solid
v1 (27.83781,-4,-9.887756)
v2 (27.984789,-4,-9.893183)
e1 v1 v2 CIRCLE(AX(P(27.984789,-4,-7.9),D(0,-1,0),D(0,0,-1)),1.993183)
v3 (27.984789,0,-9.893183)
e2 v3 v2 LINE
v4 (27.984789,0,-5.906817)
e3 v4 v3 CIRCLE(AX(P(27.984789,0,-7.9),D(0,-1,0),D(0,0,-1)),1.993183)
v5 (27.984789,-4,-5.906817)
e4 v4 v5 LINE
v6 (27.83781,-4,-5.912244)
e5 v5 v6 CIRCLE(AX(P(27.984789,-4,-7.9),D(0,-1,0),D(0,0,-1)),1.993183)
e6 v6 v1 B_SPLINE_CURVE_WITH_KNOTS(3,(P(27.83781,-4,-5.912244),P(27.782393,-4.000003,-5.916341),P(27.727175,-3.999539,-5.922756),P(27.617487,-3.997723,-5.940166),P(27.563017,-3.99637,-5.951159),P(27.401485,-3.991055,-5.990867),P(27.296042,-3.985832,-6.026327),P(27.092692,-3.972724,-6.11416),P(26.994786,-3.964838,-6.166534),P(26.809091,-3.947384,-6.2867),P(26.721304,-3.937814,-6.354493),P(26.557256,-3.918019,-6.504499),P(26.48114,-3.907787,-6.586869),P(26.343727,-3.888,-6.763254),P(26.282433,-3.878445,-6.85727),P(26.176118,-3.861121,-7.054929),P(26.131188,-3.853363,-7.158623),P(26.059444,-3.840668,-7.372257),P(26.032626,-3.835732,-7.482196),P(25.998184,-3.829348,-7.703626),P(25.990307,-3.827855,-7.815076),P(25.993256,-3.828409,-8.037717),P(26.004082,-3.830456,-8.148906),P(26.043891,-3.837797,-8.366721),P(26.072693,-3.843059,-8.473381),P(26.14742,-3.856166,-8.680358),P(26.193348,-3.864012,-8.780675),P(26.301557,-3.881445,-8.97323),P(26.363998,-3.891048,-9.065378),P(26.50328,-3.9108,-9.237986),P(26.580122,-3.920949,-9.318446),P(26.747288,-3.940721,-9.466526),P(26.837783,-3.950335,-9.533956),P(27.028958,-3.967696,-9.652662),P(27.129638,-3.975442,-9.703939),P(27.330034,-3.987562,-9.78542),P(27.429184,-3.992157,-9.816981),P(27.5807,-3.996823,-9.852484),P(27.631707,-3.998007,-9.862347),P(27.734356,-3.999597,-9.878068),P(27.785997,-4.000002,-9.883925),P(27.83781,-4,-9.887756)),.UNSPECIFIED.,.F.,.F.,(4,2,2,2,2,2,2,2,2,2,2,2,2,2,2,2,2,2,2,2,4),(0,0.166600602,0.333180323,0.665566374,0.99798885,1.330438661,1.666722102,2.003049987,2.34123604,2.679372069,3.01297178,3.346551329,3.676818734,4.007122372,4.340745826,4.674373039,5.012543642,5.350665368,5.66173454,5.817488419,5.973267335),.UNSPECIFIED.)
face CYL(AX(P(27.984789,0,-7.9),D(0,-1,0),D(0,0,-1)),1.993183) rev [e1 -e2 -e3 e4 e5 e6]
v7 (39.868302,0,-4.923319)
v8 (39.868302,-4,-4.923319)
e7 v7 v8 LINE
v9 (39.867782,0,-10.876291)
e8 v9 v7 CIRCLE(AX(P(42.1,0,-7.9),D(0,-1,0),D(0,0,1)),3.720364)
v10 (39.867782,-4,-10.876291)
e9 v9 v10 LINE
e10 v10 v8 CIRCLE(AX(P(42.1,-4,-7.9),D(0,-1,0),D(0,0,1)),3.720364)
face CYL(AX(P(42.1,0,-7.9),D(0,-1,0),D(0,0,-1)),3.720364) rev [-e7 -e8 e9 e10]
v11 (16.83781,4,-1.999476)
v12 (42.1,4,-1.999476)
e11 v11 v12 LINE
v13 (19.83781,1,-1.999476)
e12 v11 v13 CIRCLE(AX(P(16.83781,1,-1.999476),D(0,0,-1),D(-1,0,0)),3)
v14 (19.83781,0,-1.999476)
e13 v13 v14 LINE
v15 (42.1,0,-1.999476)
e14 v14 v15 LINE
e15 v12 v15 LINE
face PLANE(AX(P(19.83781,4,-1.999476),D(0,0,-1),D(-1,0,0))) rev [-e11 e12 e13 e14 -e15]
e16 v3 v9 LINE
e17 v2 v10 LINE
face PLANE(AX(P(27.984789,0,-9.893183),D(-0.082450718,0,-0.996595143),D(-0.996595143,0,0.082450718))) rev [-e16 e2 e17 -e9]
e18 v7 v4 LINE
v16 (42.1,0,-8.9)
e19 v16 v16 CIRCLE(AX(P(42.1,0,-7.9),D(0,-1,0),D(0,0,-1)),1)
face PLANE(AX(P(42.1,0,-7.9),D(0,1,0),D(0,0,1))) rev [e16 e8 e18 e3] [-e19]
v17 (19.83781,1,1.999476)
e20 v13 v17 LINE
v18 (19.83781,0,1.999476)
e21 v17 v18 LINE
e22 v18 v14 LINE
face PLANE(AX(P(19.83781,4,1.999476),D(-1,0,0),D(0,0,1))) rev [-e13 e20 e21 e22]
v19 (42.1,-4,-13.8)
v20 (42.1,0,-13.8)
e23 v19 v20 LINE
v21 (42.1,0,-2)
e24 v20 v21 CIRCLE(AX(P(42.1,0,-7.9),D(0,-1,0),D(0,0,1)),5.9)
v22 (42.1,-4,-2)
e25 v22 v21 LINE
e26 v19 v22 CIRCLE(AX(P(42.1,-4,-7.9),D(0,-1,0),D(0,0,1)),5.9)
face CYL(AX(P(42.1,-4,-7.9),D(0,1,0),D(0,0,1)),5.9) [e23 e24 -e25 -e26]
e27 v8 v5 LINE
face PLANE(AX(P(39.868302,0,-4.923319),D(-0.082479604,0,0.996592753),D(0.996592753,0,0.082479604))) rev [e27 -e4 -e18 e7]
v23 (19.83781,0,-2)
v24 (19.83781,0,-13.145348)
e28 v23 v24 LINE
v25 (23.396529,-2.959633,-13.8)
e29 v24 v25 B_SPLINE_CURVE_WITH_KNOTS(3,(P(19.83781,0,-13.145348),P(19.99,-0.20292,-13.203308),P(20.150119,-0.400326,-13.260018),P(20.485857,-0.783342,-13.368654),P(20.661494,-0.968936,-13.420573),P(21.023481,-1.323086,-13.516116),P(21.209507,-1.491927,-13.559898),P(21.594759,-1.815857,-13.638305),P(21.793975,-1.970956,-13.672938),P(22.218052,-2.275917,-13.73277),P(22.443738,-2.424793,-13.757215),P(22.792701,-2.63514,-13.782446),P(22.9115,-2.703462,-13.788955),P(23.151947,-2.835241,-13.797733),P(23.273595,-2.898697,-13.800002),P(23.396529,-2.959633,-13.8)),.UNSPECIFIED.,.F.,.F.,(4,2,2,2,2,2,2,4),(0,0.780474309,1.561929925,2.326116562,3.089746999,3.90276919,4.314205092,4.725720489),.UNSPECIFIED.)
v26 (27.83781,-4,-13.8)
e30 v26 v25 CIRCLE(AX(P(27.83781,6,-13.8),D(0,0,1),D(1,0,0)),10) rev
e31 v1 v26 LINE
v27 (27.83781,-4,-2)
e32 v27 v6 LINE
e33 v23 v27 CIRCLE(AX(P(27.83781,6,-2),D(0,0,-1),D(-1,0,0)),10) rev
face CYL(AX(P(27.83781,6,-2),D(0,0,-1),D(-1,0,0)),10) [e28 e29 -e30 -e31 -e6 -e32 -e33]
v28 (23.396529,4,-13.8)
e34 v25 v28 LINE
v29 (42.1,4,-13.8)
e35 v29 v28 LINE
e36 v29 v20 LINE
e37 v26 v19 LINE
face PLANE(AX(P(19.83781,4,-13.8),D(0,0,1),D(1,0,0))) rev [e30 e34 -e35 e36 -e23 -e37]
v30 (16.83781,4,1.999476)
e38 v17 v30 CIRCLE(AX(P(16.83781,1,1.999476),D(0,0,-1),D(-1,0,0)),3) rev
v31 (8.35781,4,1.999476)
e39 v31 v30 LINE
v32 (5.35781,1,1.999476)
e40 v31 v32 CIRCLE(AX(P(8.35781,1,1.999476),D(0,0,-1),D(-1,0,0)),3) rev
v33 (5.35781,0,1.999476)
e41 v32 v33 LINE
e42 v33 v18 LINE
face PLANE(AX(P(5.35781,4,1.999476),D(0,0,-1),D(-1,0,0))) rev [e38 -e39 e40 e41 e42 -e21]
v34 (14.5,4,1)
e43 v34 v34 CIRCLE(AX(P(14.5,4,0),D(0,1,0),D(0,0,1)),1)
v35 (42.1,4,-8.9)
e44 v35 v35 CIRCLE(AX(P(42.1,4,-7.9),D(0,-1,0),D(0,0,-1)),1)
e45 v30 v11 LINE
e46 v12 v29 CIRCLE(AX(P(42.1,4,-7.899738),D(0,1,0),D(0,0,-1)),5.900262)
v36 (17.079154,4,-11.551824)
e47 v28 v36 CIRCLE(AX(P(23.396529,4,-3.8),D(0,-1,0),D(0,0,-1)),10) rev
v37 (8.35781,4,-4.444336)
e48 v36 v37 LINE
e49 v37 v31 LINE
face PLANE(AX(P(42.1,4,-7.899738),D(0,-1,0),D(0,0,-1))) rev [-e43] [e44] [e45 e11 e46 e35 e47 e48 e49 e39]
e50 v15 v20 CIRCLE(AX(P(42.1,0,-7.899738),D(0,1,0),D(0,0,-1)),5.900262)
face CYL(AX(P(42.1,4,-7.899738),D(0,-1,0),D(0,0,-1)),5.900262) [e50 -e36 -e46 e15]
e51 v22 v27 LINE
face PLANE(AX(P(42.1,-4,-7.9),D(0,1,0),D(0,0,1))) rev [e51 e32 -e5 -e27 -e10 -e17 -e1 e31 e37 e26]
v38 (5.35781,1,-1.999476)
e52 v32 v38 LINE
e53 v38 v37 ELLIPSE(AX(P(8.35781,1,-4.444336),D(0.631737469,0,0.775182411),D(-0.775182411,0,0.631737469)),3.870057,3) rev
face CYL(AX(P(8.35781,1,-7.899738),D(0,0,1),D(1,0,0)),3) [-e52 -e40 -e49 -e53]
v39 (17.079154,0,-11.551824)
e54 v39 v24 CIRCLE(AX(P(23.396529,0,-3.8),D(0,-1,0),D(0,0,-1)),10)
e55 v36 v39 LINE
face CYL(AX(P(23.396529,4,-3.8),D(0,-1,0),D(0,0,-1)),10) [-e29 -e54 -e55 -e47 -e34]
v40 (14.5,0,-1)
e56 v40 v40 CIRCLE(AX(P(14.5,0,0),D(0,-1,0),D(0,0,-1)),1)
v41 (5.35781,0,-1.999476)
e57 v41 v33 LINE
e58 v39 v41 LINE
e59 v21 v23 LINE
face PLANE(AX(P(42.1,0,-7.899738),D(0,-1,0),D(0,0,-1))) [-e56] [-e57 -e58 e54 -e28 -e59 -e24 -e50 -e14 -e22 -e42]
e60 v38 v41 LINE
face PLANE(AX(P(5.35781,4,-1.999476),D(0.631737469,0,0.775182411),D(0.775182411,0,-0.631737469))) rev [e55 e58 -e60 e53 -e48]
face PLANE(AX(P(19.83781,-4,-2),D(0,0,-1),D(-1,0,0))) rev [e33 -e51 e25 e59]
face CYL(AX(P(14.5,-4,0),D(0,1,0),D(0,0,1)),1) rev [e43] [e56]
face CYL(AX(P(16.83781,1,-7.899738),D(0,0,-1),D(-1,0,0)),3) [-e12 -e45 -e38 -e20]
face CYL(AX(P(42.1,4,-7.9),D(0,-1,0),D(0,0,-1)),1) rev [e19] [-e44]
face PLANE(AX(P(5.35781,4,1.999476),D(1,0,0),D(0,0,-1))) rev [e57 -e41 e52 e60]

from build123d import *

# Parameters (mm, degrees)
BOSS_EXTRUDE2_DEPTH = 4
BOSS_EXTRUDE3_DEPTH = 4
CUT_EXTRUDE1_DEPTH  = 4
SKETCH7_R           = 1
CUT_EXTRUDE2_DEPTH  = 51.104542171
SKETCH9_R           = 1
CUT_EXTRUDE8_DEPTH  = 51.581272683
FILLET1_R           = 10
FILLET2_R           = 10
FILLET3_R           = 3


with BuildPart() as part:
    # Sketch1 → Boss-Extrude2 (new body)
    with BuildSketch(Plane(origin=(0, 0, 0), x_dir=(1, 0, 0), z_dir=(0, 1, 0))):
        with BuildLine():
            Line((5.357809991, 1.999476122), (19.837809991, 13.8))
            Line((19.837809991, 13.8), (42.1, 13.8))
            ThreePointArc((42.1, 13.8), (48.000261939, 7.899738061), (42.1, 1.999476122))
            Line((42.1, 1.999476122), (19.837809991, 1.999476122))
            Line((19.837809991, 1.999476122), (19.837809991, -1.999476122))
            Line((19.837809991, -1.999476122), (5.357809991, -1.999476122))
            Line((5.357809991, -1.999476122), (5.357809991, 1.999476122))
        make_face()
    extrude(amount=BOSS_EXTRUDE2_DEPTH)

    # Sketch4 → Boss-Extrude3 (add)
    with BuildSketch(Plane(origin=(0, 0, 0), x_dir=(-1, 0, 0), z_dir=(0, -1, 0))):
        with BuildLine():
            Line((-19.837809991, 2), (-42.1, 2))
            ThreePointArc((-42.1, 2), (-48, 7.9), (-42.1, 13.8))
            Line((-42.1, 13.8), (-19.837809991, 13.8))
            Line((-19.837809991, 13.8), (-19.837809991, 2))
        make_face()
    extrude(amount=BOSS_EXTRUDE3_DEPTH)

    # Sketch6 → Cut-Extrude1 (cut)
    with BuildSketch(Plane.XZ.offset(4)):
        with BuildLine():
            Line((39.868301502, -4.92331906), (27.984789323, -5.906817464))
            ThreePointArc((27.984789323, -5.906817464), (25.991606786, -7.9), (27.984789323, -9.893182536))
            Line((27.984789323, -9.893182536), (39.867781655, -10.876291126))
            ThreePointArc((39.867781655, -10.876291126), (45.820363894, -7.900324883), (39.868301502, -4.92331906))
        make_face()
    extrude(amount=-CUT_EXTRUDE1_DEPTH, mode=Mode.SUBTRACT)

    # Sketch7 → Cut-Extrude2 (cut, through all)
    with BuildSketch(Plane.XZ):
        with Locations(Location((42.1, -7.9, 0), (0, 0, 270))):
            Circle(SKETCH7_R)
    extrude(amount=-CUT_EXTRUDE2_DEPTH, mode=Mode.SUBTRACT)

    # Sketch9 → Cut-Extrude8 (cut, through all)
    with BuildSketch(Plane(origin=(0, 4, 0), x_dir=(1, 0, 0), z_dir=(0, 1, 0))):
        with Locations(Location((14.5, 0, 0), (0, 0, 270))):
            Circle(SKETCH9_R)
    extrude(amount=-CUT_EXTRUDE8_DEPTH, mode=Mode.SUBTRACT)

    # Fillet1
    # the kernel refuses this fillet: 10 mm, written as the material it takes off along each edge
    with BuildSketch(Plane(origin=(19.837809991, -4, -33.8), x_dir=(1, 0, 0), z_dir=(0, 0, 1))) as fillet1_piece_1:
        with BuildLine():
            CenterArc((8, 10), FILLET1_R, 216.869897646, 53.130102354)
            Line((0, 4), (-0.16, 3.88))
            ThreePointArc((-0.16, 3.88), (-0.2, 2), (-0.2, 0))
            Line((-0.2, 0), (0, -0.2))
            Line((0, -0.2), (8, -0.2))
            Line((8, -0.2), (8, 0))
        make_face()
    extrude(amount=51.8, mode=Mode.SUBTRACT)

    # Fillet2
    fillet2_edges = [part.edges().sort_by_distance(p)[0] for p in [
        (19.837809991, 2, -13.8),
    ]]
    fillet(fillet2_edges, radius=FILLET2_R)

    # Fillet3
    fillet3_edges = [part.edges().sort_by_distance(p)[0] for p in [
        (5.357809991, 4, 0),
        (19.837809991, 4, 0),
    ]]
    fillet(fillet3_edges, radius=FILLET3_R)


solid = part.part
